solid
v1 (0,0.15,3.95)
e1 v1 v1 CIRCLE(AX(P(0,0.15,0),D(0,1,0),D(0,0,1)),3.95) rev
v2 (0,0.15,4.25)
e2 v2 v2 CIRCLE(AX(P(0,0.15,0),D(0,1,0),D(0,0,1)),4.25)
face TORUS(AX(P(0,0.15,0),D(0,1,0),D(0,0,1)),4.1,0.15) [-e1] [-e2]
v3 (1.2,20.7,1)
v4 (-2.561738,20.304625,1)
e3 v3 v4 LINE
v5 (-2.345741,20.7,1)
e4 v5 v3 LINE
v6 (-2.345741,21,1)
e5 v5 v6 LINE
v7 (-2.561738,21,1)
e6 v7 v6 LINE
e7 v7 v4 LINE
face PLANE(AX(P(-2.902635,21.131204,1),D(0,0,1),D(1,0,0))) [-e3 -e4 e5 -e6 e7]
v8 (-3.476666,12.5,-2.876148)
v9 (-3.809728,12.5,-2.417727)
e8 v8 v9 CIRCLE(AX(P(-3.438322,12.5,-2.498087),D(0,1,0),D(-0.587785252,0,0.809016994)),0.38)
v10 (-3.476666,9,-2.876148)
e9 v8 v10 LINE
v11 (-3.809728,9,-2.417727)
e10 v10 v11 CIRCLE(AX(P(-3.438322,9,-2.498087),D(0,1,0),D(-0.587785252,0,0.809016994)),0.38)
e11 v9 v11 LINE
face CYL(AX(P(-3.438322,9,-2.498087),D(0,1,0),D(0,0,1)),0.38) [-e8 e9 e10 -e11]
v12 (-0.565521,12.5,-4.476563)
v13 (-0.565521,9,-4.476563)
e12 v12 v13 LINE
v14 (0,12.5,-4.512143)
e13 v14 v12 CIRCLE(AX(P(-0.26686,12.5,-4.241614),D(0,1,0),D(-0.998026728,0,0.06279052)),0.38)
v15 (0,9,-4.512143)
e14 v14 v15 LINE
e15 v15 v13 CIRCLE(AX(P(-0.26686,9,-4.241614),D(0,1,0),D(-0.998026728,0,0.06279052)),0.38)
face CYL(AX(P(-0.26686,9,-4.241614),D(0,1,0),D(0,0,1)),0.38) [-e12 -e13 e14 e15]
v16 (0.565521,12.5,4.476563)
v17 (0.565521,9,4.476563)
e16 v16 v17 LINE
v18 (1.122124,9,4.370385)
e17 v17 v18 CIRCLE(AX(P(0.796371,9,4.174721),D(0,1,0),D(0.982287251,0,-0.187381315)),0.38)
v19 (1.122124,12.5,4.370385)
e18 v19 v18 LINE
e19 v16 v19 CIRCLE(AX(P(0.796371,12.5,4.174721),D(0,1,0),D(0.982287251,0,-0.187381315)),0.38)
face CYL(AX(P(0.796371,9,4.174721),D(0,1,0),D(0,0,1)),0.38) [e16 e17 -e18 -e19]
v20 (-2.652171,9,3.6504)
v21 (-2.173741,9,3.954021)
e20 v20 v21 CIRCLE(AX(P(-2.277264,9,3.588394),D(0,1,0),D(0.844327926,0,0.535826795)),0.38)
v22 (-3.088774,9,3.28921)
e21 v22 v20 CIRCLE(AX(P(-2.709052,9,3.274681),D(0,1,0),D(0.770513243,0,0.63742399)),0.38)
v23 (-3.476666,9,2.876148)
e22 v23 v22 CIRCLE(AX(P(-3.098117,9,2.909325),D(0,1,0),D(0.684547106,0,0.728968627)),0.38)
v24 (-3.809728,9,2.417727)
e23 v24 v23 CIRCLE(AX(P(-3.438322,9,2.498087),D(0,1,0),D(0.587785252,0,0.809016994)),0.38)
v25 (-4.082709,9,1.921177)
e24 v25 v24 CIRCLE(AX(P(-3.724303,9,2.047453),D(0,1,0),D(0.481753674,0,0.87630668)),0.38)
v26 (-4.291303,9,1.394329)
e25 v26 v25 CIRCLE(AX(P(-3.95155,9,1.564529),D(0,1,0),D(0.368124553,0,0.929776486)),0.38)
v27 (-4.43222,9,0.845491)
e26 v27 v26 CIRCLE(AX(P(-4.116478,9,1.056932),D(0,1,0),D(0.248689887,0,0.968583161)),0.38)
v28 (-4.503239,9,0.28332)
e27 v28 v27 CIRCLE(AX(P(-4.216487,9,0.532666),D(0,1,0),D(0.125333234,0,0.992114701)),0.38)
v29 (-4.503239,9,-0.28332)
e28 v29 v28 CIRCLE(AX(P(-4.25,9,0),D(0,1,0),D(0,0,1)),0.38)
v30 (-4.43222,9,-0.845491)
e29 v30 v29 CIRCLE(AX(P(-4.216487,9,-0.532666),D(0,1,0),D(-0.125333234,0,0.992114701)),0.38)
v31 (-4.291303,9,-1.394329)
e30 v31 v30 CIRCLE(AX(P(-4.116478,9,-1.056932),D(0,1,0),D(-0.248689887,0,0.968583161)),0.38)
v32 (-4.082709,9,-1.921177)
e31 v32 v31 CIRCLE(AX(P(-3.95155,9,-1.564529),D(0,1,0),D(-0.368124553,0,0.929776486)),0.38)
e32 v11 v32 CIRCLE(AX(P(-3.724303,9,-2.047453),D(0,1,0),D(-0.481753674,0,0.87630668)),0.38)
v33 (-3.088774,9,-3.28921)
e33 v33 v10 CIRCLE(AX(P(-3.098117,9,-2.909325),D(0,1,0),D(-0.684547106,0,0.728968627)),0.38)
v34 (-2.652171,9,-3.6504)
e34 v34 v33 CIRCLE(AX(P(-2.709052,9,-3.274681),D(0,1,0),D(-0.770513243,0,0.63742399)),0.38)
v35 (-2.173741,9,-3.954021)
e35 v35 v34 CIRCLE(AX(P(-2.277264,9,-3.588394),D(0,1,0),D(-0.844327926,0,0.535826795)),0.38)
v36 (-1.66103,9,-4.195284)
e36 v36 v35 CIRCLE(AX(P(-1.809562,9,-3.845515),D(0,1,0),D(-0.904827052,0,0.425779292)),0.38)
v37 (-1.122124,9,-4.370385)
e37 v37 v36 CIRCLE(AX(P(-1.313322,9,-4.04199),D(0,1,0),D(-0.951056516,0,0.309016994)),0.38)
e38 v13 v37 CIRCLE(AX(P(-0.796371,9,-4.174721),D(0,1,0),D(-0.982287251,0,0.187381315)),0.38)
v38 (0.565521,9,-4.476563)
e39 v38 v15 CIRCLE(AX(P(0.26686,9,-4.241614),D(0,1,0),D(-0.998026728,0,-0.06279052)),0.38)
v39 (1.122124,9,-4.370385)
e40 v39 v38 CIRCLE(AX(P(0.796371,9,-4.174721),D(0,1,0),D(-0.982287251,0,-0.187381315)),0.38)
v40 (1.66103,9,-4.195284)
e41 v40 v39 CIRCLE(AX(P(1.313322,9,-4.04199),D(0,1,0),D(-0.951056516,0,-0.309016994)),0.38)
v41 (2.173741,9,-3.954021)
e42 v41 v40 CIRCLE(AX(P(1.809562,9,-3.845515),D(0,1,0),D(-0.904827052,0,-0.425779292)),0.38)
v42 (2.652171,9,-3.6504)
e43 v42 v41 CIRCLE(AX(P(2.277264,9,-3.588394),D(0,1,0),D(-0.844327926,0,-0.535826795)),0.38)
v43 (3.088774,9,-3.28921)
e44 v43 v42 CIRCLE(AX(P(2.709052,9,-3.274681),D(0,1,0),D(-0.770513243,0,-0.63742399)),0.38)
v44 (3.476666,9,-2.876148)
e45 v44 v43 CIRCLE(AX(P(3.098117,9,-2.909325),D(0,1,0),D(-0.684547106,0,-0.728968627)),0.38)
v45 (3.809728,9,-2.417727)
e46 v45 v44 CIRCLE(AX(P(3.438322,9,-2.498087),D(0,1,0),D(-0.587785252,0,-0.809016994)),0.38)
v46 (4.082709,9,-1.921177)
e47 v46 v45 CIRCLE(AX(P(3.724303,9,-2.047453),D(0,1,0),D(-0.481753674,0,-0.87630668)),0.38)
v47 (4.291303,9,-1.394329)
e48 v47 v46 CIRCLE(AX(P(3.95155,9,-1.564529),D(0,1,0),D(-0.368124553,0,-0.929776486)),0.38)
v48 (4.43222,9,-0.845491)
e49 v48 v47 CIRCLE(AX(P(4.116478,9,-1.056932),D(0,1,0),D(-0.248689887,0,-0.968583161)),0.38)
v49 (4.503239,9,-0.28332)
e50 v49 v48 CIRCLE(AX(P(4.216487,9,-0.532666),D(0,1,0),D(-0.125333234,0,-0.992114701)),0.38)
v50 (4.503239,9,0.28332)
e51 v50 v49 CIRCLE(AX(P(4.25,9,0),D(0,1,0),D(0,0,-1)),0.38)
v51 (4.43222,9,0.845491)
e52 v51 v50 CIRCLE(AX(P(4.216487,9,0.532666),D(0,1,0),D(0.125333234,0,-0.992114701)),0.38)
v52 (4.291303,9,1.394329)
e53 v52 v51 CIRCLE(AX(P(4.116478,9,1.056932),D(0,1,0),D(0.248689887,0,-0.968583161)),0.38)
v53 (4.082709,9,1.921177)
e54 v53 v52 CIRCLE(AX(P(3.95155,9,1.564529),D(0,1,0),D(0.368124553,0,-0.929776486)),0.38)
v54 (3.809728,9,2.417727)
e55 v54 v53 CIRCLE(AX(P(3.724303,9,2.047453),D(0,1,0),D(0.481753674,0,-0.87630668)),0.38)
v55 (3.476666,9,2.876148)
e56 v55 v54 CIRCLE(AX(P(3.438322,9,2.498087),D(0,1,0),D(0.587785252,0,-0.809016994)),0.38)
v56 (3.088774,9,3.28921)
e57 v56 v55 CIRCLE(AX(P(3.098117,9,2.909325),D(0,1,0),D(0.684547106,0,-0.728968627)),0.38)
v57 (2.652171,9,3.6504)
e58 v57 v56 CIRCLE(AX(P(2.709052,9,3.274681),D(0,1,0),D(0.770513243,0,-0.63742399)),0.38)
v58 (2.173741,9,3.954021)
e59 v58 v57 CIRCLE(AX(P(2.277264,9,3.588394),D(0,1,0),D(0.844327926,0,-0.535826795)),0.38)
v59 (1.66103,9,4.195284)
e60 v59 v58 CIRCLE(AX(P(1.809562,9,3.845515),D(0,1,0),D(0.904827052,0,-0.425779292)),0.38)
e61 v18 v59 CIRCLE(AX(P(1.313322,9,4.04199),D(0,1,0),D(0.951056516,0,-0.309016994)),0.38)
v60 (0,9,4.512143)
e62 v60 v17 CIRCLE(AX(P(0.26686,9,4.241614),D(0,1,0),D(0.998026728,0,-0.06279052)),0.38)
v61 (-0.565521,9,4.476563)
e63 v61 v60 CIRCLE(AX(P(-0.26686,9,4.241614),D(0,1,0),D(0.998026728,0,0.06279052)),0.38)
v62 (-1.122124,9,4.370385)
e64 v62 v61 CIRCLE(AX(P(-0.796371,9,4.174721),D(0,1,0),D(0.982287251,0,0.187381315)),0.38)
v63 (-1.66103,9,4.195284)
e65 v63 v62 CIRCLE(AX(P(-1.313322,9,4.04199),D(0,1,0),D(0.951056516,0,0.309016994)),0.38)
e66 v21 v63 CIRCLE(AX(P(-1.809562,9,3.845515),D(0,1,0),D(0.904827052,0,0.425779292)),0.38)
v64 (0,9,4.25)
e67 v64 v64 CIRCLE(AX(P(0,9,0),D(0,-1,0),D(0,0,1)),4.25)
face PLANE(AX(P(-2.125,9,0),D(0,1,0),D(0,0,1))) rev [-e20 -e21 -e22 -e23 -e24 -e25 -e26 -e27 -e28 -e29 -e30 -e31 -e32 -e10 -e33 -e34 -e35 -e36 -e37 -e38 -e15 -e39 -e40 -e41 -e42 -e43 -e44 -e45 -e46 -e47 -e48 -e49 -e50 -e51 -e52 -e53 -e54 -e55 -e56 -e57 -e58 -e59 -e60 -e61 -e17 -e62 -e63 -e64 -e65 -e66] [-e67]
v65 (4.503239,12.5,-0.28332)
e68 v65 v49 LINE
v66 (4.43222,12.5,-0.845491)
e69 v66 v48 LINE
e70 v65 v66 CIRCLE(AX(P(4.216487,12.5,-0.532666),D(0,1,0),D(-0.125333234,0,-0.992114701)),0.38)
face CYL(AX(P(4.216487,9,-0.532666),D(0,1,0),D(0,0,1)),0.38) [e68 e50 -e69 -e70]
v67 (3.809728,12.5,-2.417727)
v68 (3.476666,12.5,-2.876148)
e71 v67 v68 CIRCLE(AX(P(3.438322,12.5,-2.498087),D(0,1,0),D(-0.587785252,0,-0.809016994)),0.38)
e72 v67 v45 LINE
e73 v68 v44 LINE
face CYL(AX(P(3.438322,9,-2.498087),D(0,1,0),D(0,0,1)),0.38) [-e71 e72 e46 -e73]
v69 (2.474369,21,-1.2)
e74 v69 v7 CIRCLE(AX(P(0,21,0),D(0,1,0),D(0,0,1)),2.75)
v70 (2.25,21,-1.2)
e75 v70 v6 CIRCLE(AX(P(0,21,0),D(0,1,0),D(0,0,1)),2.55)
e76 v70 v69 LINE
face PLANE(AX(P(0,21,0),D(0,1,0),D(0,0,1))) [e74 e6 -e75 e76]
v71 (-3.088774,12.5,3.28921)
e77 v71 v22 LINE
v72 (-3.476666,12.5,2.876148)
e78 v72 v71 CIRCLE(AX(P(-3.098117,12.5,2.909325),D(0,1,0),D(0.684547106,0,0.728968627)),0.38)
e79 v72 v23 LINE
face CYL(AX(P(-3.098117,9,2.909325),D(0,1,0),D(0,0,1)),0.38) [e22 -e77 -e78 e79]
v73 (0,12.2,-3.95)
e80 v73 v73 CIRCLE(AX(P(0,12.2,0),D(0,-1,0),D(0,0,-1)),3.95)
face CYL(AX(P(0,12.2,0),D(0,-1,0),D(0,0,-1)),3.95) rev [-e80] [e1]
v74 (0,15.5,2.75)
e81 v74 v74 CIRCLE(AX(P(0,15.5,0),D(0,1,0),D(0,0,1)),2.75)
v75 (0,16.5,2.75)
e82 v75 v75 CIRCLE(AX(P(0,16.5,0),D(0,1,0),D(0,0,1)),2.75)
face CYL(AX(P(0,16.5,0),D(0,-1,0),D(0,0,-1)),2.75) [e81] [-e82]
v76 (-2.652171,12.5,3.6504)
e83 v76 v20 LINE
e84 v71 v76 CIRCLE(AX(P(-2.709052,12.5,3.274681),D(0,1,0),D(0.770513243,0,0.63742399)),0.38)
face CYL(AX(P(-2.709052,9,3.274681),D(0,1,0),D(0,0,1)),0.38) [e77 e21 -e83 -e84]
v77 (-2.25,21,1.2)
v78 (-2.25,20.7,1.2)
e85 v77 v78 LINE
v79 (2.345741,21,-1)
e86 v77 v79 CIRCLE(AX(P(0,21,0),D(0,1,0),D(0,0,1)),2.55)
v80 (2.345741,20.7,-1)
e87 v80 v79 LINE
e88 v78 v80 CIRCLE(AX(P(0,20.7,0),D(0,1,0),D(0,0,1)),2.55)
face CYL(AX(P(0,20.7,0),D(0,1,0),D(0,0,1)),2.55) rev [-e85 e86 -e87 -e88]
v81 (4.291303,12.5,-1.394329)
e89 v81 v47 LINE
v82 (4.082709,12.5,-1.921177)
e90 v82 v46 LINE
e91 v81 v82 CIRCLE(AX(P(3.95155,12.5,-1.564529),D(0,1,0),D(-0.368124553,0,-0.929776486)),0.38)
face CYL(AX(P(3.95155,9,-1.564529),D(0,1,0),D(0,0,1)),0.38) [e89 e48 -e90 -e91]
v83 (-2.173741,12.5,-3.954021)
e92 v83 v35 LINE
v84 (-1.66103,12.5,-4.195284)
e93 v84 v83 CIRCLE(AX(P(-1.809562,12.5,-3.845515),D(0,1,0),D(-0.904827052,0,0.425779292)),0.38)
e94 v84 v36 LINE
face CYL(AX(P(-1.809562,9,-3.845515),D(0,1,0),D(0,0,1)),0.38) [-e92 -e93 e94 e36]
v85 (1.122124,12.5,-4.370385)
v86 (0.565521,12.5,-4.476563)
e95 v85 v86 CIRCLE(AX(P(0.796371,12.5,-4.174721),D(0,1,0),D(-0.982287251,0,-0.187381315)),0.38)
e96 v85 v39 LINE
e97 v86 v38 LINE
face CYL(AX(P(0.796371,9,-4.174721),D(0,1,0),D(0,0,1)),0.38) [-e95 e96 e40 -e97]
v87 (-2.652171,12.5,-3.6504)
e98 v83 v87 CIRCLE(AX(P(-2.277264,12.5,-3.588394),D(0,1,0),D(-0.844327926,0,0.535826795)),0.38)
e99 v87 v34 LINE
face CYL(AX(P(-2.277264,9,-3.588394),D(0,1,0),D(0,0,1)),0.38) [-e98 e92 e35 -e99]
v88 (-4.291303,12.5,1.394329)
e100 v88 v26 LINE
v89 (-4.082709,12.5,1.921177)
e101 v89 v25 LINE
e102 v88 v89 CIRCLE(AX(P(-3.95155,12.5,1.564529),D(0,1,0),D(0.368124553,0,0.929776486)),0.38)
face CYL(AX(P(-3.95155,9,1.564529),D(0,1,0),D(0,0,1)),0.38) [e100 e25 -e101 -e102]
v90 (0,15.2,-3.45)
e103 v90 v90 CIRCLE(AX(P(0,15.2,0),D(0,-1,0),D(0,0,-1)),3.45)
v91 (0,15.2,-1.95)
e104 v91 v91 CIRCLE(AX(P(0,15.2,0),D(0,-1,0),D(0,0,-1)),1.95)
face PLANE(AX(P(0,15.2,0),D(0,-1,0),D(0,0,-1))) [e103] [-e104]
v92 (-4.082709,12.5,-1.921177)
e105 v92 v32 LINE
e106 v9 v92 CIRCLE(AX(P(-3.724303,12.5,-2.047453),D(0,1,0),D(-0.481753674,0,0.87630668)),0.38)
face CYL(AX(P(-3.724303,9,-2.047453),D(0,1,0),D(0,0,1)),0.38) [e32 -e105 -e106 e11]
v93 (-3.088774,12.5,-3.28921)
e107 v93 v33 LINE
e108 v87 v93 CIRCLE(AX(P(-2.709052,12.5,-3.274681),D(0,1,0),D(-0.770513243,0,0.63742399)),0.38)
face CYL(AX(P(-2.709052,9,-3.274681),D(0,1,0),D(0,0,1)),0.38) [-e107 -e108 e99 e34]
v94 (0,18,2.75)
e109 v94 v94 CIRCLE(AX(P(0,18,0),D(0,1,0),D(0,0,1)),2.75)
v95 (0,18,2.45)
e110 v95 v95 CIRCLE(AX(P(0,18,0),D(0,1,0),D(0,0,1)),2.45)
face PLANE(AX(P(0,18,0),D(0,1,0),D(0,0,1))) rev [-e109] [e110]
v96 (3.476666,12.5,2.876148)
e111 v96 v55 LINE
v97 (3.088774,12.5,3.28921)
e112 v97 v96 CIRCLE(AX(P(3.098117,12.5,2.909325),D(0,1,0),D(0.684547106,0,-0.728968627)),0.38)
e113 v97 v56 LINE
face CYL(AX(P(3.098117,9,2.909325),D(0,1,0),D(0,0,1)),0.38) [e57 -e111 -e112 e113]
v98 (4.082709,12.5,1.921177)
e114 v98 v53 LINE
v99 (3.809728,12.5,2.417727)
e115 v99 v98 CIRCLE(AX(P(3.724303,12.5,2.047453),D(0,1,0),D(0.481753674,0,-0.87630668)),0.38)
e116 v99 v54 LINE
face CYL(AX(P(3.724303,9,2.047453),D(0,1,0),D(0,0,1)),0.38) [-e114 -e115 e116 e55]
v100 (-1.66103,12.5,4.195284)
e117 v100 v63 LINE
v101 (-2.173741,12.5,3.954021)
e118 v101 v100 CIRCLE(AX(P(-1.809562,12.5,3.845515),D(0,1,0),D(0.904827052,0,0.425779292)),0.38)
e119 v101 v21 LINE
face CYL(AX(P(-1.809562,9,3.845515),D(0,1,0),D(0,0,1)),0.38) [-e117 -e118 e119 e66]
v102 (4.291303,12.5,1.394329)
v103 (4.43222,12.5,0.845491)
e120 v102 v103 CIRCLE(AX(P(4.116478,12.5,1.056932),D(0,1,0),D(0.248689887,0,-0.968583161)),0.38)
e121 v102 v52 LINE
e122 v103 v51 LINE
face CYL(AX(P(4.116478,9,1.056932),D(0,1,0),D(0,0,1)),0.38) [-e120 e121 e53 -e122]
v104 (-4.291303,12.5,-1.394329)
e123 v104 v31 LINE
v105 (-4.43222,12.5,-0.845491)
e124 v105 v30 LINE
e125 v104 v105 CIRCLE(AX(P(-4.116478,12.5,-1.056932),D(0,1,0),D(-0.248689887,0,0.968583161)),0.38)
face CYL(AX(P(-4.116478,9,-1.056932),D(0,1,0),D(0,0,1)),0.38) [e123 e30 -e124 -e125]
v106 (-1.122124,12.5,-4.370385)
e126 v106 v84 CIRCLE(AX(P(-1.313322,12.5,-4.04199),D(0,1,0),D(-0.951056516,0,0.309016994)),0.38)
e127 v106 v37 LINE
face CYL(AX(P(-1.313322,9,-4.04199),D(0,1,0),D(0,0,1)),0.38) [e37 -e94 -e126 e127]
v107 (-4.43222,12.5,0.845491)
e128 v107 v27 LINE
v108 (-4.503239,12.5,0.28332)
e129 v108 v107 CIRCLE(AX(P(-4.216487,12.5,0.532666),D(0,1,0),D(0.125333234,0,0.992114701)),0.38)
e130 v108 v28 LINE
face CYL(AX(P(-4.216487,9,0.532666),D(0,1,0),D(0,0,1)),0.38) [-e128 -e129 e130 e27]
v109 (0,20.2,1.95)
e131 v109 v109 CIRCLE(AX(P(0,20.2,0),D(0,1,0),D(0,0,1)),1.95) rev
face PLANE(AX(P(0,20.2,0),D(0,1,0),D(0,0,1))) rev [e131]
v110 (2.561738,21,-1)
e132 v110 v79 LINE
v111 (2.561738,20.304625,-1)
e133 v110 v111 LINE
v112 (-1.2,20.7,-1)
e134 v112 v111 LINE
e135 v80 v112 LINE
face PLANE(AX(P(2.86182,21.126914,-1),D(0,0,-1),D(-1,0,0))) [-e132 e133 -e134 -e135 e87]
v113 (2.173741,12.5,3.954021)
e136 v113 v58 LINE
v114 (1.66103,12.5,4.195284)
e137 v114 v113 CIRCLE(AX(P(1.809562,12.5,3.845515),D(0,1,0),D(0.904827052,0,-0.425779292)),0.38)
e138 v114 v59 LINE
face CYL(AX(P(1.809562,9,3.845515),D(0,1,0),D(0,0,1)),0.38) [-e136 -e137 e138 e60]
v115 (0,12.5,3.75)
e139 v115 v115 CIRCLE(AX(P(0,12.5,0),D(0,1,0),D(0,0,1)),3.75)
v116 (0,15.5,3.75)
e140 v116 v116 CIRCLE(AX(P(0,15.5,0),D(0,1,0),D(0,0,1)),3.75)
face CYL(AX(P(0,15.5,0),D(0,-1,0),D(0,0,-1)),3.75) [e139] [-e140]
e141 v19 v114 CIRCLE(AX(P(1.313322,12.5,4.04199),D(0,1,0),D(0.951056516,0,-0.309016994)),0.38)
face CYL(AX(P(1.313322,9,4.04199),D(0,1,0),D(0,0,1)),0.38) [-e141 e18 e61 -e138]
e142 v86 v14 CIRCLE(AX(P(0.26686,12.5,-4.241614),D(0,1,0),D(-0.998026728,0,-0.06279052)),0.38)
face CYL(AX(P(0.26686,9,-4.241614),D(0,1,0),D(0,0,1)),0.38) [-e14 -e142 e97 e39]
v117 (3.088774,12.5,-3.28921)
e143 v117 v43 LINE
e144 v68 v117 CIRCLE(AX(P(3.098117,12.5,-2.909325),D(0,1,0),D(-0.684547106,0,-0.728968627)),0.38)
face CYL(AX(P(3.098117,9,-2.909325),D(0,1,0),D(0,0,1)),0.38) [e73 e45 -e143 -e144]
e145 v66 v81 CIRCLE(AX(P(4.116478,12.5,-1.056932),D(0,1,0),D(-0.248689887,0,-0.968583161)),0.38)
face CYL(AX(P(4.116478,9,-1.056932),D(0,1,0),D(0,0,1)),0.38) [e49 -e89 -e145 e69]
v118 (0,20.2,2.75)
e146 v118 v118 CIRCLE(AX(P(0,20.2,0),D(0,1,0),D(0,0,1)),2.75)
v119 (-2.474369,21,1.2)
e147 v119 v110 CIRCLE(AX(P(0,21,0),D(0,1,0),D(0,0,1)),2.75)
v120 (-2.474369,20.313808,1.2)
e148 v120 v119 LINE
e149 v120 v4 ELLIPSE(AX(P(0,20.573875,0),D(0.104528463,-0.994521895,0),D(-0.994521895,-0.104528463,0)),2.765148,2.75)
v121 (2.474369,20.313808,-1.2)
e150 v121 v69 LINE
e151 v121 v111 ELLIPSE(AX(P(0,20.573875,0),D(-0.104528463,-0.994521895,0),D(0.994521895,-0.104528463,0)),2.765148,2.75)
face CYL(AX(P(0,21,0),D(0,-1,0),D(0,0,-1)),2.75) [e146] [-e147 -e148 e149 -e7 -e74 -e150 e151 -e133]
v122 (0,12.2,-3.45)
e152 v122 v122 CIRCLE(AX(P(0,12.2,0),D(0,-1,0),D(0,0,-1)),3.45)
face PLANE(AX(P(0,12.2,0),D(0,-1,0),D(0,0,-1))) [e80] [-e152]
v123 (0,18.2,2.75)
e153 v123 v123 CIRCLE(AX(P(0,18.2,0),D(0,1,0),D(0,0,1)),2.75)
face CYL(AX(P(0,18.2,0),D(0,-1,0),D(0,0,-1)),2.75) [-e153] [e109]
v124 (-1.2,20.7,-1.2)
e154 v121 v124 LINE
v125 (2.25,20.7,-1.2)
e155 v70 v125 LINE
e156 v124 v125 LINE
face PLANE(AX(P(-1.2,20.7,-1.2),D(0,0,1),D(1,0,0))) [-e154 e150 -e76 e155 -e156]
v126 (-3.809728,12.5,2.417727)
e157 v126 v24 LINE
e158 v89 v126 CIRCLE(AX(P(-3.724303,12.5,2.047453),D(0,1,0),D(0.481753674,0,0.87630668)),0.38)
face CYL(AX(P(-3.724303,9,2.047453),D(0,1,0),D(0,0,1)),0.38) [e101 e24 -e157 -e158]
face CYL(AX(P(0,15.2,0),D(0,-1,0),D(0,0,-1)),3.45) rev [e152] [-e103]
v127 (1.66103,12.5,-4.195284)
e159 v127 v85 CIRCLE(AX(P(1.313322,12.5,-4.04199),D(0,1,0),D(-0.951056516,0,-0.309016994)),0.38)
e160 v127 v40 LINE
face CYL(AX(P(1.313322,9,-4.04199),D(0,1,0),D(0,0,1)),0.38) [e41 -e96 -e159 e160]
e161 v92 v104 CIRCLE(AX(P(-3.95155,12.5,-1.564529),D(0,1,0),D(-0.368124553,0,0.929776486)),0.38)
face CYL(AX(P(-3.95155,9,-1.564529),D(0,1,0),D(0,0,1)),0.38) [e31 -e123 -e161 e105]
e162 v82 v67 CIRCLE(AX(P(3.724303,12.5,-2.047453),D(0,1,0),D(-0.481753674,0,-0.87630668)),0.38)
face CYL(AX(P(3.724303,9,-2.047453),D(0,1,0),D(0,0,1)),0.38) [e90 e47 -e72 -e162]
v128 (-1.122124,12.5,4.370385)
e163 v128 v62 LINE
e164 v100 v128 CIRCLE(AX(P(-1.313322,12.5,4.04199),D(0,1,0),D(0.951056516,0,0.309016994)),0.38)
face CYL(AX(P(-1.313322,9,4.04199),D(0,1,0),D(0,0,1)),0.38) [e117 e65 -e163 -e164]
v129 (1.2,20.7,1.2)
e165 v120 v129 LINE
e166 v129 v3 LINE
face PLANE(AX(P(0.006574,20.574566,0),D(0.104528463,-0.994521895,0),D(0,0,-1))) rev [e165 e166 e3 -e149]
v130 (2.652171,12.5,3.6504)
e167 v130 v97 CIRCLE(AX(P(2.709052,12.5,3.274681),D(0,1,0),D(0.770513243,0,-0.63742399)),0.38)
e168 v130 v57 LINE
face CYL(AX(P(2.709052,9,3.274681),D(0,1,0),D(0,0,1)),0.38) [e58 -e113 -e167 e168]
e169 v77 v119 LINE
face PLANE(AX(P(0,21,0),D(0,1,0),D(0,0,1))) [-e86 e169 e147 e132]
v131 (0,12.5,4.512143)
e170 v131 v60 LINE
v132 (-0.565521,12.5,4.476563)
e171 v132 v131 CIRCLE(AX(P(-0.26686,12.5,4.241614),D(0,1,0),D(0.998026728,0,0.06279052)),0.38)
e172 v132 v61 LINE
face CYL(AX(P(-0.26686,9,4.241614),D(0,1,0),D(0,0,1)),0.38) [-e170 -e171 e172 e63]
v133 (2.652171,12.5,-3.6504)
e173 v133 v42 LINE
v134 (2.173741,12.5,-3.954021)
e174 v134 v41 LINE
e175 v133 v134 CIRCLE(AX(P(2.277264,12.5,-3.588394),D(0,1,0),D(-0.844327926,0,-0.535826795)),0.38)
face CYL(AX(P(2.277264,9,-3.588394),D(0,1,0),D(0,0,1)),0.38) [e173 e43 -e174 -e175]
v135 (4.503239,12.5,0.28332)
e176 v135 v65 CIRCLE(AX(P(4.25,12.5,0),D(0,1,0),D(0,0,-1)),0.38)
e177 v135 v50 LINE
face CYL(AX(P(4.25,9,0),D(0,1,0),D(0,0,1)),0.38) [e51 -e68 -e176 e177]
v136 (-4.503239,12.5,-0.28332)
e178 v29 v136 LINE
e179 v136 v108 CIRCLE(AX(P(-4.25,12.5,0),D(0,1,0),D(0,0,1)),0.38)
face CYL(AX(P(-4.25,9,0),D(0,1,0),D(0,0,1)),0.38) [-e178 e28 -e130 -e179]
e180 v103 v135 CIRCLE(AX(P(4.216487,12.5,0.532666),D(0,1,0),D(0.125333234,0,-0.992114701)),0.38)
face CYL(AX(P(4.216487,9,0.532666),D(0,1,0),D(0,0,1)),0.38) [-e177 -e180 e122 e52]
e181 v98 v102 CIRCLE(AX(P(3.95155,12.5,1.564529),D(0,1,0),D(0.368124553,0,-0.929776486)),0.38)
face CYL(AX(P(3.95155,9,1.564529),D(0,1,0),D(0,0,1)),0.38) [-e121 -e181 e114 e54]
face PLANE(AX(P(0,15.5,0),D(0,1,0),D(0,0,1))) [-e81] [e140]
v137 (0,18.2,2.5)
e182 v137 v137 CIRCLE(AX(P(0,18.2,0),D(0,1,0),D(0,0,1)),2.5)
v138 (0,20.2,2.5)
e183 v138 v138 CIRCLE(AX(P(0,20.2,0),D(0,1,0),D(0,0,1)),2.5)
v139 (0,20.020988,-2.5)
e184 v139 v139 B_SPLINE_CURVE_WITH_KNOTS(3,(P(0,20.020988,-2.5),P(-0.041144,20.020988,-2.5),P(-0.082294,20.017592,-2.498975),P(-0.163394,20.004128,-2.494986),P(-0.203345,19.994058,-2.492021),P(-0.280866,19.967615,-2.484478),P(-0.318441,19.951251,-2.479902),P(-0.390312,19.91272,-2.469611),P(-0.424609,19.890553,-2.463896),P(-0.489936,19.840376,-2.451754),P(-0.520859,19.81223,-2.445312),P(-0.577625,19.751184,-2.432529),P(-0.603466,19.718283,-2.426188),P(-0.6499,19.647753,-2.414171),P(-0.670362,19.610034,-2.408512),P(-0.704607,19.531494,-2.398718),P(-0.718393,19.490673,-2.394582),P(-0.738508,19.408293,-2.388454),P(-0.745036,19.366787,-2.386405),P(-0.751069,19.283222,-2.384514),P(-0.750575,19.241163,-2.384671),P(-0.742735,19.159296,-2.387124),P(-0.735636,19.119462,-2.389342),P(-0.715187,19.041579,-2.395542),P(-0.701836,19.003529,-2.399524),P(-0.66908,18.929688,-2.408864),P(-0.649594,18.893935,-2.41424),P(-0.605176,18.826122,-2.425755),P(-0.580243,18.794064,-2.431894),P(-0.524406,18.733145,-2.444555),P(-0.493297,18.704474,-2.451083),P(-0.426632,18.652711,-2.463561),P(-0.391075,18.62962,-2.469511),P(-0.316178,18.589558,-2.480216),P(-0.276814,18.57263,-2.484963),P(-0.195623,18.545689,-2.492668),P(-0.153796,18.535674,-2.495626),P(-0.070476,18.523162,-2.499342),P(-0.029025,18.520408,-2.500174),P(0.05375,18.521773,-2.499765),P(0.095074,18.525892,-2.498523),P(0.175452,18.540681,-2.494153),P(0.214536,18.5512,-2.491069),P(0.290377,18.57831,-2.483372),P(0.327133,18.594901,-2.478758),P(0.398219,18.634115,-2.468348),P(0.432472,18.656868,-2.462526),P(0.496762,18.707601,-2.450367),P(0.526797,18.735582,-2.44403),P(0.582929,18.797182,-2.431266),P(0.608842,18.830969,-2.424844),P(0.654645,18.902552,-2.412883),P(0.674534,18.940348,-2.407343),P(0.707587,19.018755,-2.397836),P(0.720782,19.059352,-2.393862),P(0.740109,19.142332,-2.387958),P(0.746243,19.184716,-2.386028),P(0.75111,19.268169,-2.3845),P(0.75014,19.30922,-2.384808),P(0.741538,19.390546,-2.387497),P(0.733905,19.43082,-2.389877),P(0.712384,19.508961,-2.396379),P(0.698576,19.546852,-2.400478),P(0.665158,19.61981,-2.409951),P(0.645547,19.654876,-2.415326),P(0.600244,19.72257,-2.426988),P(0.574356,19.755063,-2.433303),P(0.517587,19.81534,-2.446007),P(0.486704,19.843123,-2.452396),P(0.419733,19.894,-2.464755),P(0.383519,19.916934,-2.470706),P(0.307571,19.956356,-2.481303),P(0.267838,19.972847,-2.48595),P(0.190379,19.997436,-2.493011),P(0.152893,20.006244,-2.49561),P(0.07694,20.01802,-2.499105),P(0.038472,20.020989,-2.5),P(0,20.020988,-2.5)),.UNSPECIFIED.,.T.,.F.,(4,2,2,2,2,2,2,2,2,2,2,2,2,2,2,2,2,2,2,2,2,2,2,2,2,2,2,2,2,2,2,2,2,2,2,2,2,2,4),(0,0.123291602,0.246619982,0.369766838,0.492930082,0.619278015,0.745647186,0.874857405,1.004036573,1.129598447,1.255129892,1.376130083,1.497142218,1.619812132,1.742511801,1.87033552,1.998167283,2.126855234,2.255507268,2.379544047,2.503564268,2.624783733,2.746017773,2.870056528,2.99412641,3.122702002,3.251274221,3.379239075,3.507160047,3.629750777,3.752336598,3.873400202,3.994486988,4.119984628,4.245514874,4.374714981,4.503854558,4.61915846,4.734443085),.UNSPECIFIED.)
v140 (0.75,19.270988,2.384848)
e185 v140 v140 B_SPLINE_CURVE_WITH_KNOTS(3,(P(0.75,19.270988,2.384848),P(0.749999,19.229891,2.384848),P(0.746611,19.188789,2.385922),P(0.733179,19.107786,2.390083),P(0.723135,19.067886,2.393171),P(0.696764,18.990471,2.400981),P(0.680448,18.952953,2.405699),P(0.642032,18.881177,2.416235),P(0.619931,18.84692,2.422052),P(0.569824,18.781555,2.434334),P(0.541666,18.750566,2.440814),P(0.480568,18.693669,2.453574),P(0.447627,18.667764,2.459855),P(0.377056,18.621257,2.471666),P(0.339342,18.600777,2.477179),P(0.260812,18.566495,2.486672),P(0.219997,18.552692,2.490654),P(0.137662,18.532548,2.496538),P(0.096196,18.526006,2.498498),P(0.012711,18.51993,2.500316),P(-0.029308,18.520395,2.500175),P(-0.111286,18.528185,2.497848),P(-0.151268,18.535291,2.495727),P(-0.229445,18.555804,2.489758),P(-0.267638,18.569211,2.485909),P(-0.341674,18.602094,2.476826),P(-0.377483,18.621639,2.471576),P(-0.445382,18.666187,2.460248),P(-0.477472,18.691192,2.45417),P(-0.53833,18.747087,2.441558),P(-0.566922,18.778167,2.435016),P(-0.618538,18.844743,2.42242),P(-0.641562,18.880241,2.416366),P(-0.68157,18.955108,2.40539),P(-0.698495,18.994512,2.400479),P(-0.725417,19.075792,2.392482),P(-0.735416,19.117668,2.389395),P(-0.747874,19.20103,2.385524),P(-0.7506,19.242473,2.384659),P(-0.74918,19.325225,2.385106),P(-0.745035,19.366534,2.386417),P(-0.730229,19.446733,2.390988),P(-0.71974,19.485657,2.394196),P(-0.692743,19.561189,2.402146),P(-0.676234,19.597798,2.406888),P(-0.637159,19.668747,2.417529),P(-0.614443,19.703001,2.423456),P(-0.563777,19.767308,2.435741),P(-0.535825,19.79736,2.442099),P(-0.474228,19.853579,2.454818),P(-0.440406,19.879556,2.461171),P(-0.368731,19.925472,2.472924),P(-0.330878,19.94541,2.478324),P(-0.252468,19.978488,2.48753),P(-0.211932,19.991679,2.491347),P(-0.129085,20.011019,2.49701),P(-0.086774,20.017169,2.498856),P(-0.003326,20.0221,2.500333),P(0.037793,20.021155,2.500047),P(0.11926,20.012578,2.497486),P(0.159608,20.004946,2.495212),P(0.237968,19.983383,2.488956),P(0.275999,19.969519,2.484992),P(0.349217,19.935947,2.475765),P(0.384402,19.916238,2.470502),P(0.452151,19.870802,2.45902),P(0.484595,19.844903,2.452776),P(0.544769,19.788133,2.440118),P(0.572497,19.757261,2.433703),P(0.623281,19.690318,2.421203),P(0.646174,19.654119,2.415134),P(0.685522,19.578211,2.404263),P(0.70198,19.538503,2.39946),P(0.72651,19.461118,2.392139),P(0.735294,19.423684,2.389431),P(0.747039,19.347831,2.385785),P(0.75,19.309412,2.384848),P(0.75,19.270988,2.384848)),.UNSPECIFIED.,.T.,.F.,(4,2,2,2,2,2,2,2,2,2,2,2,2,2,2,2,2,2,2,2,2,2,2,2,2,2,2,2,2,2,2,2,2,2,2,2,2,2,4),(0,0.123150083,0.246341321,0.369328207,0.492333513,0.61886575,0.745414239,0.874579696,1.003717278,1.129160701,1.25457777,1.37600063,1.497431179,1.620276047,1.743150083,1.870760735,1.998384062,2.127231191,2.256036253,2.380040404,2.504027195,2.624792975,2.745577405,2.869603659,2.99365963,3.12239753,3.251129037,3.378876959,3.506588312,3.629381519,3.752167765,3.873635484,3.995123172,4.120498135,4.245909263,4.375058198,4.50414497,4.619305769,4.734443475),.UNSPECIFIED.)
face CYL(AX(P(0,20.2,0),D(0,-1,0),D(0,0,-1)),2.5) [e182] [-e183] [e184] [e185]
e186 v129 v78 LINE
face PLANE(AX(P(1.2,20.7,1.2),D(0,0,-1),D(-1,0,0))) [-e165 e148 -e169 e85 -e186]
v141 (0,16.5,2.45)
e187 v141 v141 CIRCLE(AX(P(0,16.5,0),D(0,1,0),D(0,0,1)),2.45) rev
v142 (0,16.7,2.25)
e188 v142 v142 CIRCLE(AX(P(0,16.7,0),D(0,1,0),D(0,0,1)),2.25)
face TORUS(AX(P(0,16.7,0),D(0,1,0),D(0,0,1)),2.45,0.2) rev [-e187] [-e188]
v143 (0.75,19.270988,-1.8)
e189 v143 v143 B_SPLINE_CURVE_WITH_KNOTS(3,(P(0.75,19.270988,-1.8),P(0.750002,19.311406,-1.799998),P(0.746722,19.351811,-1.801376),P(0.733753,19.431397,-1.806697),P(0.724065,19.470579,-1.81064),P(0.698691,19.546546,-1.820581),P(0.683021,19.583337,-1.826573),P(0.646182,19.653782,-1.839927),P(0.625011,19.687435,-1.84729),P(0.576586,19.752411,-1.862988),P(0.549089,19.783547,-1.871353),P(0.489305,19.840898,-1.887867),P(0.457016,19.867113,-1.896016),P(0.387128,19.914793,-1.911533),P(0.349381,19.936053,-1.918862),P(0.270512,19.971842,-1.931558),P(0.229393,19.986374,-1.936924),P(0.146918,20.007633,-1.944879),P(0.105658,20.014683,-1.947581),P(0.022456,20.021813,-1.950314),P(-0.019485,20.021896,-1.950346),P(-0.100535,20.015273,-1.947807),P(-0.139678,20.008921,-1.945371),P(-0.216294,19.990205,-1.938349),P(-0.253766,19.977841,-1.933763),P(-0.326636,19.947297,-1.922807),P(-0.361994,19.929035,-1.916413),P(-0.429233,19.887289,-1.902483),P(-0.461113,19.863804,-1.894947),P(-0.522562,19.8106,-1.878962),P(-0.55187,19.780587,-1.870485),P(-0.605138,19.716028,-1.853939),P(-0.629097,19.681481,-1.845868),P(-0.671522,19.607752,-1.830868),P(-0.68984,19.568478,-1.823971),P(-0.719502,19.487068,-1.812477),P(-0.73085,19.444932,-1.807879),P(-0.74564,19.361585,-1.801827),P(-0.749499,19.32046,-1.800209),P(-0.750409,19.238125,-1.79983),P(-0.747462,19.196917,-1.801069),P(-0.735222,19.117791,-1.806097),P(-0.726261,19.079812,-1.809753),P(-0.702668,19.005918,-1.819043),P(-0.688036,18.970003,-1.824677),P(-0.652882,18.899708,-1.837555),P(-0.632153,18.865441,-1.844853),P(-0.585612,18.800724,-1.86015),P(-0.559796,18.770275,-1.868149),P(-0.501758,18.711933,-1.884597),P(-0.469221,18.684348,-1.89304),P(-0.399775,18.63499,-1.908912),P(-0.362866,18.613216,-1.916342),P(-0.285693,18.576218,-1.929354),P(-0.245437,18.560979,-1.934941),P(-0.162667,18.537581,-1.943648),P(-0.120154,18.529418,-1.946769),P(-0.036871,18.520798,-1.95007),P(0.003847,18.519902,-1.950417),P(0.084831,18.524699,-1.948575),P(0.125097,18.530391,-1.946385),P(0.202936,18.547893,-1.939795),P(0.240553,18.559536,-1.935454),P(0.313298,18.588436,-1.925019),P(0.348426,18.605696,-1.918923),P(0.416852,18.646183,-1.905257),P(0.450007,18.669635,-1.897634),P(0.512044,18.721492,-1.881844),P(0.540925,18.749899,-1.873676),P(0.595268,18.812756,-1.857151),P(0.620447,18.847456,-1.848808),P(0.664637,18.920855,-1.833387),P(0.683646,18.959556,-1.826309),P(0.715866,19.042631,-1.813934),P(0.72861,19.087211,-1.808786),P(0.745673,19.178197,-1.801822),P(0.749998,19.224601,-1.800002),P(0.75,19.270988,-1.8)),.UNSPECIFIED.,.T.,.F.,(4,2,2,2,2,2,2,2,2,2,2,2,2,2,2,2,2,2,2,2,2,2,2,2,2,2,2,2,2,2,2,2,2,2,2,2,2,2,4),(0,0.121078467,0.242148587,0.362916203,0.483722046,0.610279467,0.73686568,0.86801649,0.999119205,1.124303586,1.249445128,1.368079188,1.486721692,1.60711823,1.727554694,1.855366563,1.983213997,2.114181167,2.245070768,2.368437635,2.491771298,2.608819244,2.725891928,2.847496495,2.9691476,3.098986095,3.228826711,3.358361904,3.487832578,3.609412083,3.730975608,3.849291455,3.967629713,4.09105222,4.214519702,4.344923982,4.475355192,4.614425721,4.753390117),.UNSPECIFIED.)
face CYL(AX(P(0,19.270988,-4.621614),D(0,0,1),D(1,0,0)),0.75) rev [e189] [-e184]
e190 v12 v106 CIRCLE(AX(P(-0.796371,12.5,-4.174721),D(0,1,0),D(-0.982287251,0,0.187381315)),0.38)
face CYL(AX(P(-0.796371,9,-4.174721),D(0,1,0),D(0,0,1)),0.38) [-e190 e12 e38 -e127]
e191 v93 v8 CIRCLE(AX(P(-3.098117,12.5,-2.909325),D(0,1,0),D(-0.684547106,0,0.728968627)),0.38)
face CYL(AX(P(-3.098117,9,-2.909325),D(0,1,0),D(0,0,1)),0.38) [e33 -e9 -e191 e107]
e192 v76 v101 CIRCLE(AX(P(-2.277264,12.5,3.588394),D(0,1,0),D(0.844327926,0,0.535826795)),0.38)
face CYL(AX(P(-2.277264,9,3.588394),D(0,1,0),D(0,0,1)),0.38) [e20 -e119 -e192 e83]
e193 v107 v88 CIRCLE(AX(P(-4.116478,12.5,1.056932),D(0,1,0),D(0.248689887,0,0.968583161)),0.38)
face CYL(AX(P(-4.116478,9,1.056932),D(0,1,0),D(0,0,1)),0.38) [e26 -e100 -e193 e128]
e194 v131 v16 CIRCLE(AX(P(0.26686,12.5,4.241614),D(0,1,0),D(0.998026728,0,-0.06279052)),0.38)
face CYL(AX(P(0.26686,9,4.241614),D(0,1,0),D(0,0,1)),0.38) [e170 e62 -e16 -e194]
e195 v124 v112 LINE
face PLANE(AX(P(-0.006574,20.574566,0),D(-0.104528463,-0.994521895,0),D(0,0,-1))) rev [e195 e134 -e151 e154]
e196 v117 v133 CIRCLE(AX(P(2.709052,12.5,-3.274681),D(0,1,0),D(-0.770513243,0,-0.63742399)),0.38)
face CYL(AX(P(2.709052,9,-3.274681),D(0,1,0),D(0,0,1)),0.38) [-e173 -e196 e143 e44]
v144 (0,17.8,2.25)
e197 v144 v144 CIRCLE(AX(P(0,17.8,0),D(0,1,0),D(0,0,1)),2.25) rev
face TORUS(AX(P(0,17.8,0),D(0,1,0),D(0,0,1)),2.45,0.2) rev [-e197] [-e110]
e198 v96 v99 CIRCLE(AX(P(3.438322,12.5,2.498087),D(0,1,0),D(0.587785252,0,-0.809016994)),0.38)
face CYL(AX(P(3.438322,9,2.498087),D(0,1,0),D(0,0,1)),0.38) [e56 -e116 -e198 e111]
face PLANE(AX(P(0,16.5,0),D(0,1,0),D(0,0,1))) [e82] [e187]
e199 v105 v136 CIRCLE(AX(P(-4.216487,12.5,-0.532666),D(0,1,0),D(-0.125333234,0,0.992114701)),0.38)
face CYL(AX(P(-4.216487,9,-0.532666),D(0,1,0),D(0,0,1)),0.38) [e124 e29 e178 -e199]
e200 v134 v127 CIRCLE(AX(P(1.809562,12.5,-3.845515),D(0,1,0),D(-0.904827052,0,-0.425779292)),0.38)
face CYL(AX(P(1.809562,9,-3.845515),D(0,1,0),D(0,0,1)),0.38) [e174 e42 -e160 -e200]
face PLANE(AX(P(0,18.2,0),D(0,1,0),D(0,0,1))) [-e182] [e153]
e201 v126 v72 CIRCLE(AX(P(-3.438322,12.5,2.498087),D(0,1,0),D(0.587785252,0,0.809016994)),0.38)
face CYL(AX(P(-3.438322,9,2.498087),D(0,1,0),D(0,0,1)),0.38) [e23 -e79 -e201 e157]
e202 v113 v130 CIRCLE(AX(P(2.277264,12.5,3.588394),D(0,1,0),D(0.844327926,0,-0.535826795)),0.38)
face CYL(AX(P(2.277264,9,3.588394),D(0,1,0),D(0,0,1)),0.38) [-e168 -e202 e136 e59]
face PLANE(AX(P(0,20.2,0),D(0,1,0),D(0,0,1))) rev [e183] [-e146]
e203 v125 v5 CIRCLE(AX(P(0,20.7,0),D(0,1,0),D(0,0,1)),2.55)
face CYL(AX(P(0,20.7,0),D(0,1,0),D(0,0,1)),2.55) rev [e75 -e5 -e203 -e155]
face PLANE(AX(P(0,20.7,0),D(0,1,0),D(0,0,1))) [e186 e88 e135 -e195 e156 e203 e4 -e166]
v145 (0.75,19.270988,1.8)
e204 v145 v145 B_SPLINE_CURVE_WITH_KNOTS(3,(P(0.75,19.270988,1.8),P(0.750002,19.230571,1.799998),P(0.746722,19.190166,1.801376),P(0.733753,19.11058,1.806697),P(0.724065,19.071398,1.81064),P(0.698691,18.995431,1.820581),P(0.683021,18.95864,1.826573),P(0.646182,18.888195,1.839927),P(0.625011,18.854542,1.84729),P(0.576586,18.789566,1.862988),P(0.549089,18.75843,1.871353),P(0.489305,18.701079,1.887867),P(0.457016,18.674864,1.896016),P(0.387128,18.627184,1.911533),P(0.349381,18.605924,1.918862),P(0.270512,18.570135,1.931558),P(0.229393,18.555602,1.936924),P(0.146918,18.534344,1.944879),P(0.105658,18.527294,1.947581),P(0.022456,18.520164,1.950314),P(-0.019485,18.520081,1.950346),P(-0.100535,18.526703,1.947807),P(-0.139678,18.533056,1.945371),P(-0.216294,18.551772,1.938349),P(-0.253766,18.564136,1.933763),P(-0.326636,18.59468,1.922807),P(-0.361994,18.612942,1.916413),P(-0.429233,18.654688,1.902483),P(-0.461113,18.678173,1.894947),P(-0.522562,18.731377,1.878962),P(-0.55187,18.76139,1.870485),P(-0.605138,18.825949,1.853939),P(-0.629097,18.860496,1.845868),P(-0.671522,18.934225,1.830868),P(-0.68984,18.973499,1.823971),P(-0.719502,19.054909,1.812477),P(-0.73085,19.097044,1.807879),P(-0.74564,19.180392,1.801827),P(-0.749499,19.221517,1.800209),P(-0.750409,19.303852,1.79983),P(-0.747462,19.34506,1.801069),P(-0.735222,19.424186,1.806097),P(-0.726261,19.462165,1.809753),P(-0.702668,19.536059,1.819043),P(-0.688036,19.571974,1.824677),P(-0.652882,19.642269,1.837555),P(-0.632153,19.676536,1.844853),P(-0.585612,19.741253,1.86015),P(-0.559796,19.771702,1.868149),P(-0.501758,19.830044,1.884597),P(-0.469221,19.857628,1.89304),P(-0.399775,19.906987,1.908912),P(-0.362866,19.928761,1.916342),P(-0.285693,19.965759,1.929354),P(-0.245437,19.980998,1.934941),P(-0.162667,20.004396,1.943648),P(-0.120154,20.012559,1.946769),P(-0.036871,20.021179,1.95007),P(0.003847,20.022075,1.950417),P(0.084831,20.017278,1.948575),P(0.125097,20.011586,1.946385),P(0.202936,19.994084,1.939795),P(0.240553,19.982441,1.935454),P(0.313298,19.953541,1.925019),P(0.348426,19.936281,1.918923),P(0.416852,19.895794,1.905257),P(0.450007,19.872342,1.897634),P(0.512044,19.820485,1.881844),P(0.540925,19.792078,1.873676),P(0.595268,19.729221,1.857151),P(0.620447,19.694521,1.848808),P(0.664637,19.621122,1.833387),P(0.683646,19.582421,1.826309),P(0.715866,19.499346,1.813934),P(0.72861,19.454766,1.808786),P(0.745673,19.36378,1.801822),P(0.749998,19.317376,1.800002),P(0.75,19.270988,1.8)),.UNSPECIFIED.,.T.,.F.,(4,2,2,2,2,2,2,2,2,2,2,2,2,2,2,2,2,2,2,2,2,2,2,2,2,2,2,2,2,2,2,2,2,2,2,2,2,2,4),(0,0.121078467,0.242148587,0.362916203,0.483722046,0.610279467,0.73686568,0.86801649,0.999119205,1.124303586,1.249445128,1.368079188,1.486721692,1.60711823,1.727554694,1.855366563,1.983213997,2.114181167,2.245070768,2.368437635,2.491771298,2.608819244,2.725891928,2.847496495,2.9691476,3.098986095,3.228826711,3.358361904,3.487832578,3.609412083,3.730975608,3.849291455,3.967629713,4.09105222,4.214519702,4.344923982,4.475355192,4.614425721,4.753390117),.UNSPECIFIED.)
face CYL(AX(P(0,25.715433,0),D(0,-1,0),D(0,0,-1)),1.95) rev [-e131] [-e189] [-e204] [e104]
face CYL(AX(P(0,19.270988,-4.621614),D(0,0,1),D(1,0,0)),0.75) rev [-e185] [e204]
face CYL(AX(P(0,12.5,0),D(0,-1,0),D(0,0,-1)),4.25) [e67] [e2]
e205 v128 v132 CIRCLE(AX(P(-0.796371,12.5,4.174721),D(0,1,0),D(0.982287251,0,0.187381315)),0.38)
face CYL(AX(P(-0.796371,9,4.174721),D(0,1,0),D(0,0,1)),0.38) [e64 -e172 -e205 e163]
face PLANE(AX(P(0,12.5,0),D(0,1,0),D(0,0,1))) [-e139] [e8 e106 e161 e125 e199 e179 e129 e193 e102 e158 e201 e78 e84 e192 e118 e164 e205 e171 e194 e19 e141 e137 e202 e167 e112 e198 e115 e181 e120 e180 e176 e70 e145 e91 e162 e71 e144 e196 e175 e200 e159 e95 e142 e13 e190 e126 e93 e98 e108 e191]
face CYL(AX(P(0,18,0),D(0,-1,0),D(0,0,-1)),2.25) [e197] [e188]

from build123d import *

# Parameters (mm, degrees)
SKETCH1_R                    = 4.25
BOSS_EXTRUDE1_DEPTH          = 12.5
BOSS_EXTRUDE4_START          = -3.5
BOSS_EXTRUDE4_DEPTH          = 3.5
CIRPATTERN5_COUNT            = 50
SKETCH5_R                    = 3.75
BOSS_EXTRUDE5_DEPTH          = 3
SKETCH6_R                    = 2.75
BOSS_EXTRUDE6_DEPTH          = 1
SKETCH7_R                    = 2.25
BOSS_EXTRUDE7_DEPTH          = 1.5
SKETCH8_R                    = 2.75
BOSS_EXTRUDE8_DEPTH          = 0.2
SKETCH9_R                    = 2.5
BOSS_EXTRUDE9_DEPTH          = 2
SKETCH10_R                   = 2.75
BOSS_EXTRUDE10_DEPTH         = 0.8
SKETCH11_R                   = 2.55
CUT_EXTRUDE1_DEPTH           = 0.3
SKETCH12_W                   = 4.125233548
SKETCH12_H                   = 0.2
CUT_REVOLVE1_ANGLE           = 6
CUT_REVOLVE1_OTHER_WAY_ANGLE = 6
SKETCH13_W                   = 4.08419342
SKETCH13_H                   = 0.2
CUT_REVOLVE2_ANGLE           = 6
CUT_REVOLVE2_OTHER_WAY_ANGLE = 6
CUT_EXTRUDE2_DEPTH           = 22.995367972
CUT_EXTRUDE2_DEPTH_BACK      = 22.995367972
SKETCH15_R                   = 0.75
SKETCH16_R                   = 3.95
CUT_EXTRUDE3_DEPTH           = 12.2
SKETCH17_R                   = 3.45
CUT_EXTRUDE4_DEPTH           = 3
CUT_EXTRUDE5_REACH           = 18.548
SKETCH19_R                   = 1.95
FILLET1_R                    = 0.2
FILLET2_R                    = 0.15


with BuildPart() as part:
    # Sketch1 → Boss-Extrude1 (new body)
    with BuildSketch(Plane(origin=(0, 0, 0), x_dir=(1, 0, 0), z_dir=(0, 1, 0))):
        with Locations(Location((0, 0, 0), (0, 0, 270))):
            Circle(SKETCH1_R)
    extrude(amount=BOSS_EXTRUDE1_DEPTH)

    # Sketch4 → Boss-Extrude4 (add)
    with BuildSketch(Plane(origin=(0, 12.5, 0), x_dir=(1, 0, 0), z_dir=(0, 1, 0)).offset(BOSS_EXTRUDE4_START)):
        with BuildLine():
            ThreePointArc((-4.233011765, 0.379620073), (-4.25, 0), (-4.233011765, -0.379620073))
            ThreePointArc((-4.233011765, -0.379620073), (-4.63, 0), (-4.233011765, 0.379620073))
        make_face()
    boss_extrude4 = extrude(amount=BOSS_EXTRUDE4_DEPTH)

    # CirPattern5: Boss-Extrude4 ×50 about axis
    cirpattern5_axis = Axis((0, 0, 0), (0, 1, 0))
    for i in range(1, CIRPATTERN5_COUNT):
        add(boss_extrude4.rotate(cirpattern5_axis, i * 360 / CIRPATTERN5_COUNT))

    # Sketch5 → Boss-Extrude5 (add)
    with BuildSketch(Plane(origin=(0, 12.5, 0), x_dir=(1, 0, 0), z_dir=(0, 1, 0))):
        with Locations(Location((0, 0, 0), (0, 0, 270))):
            Circle(SKETCH5_R)
    extrude(amount=BOSS_EXTRUDE5_DEPTH)

    # Sketch6 → Boss-Extrude6 (add)
    with BuildSketch(Plane(origin=(0, 15.5, 0), x_dir=(1, 0, 0), z_dir=(0, 1, 0))):
        with Locations(Location((0, 0, 0), (0, 0, 270))):
            Circle(SKETCH6_R)
    extrude(amount=BOSS_EXTRUDE6_DEPTH)

    # Sketch7 → Boss-Extrude7 (add)
    with BuildSketch(Plane(origin=(0, 16.5, 0), x_dir=(1, 0, 0), z_dir=(0, 1, 0))):
        with Locations(Location((0, 0, 0), (0, 0, 270))):
            Circle(SKETCH7_R)
    extrude(amount=BOSS_EXTRUDE7_DEPTH)

    # Sketch8 → Boss-Extrude8 (add)
    with BuildSketch(Plane(origin=(0, 18, 0), x_dir=(1, 0, 0), z_dir=(0, 1, 0))):
        with Locations(Location((0, 0, 0), (0, 0, 270))):
            Circle(SKETCH8_R)
    extrude(amount=BOSS_EXTRUDE8_DEPTH)

    # Sketch9 → Boss-Extrude9 (add)
    with BuildSketch(Plane(origin=(0, 18.2, 0), x_dir=(1, 0, 0), z_dir=(0, 1, 0))):
        with Locations(Location((0, 0, 0), (0, 0, 270))):
            Circle(SKETCH9_R)
    extrude(amount=BOSS_EXTRUDE9_DEPTH)

    # Sketch10 → Boss-Extrude10 (add)
    with BuildSketch(Plane(origin=(0, 20.2, 0), x_dir=(1, 0, 0), z_dir=(0, 1, 0))):
        with Locations(Location((0, 0, 0), (0, 0, 270))):
            Circle(SKETCH10_R)
    extrude(amount=BOSS_EXTRUDE10_DEPTH)

    # Sketch11 → Cut-Extrude1 (cut)
    with BuildSketch(Plane(origin=(0, 21, 0), x_dir=(1, 0, 0), z_dir=(0, 1, 0))):
        with Locations(Location((0, 0, 0), (0, 0, 270))):
            Circle(SKETCH11_R)
    extrude(amount=-CUT_EXTRUDE1_DEPTH, mode=Mode.SUBTRACT)

    # Sketch12 → Cut-Revolve1 (revolve, cut)
    with BuildSketch(Plane(origin=(0, 20.7, 0), x_dir=(1, 0, 0), z_dir=(0, 1, 0))):
        with Locations((-0.862616774, -1.1)):
            Rectangle(SKETCH12_W, SKETCH12_H)
    revolve(axis=Axis((1.2, 20.7, -2.474368606), (0, 0, 1)), revolution_arc=CUT_REVOLVE1_ANGLE, mode=Mode.SUBTRACT)

    # Sketch12 → Cut-Revolve1 other way (revolve, cut)
    with BuildSketch(Plane(origin=(0, 20.7, 0), x_dir=(1, 0, 0), z_dir=(0, 1, 0))):
        with Locations((-0.862616774, -1.1)):
            Rectangle(SKETCH12_W, SKETCH12_H)
    revolve(axis=Axis((1.2, 20.7, -2.474368606), (0, 0, -1)), revolution_arc=CUT_REVOLVE1_OTHER_WAY_ANGLE, mode=Mode.SUBTRACT)

    # Sketch13 → Cut-Revolve2 (revolve, cut)
    with BuildSketch(Plane(origin=(0, 20.7, 0), x_dir=(1, 0, 0), z_dir=(0, 1, 0))):
        with Locations((0.84209671, 1.1)):
            Rectangle(SKETCH13_W, SKETCH13_H)
    revolve(axis=Axis((-1.2, 20.7, -2.950120445), (0, 0, 1)), revolution_arc=CUT_REVOLVE2_ANGLE, mode=Mode.SUBTRACT)

    # Sketch13 → Cut-Revolve2 other way (revolve, cut)
    with BuildSketch(Plane(origin=(0, 20.7, 0), x_dir=(1, 0, 0), z_dir=(0, 1, 0))):
        with Locations((0.84209671, 1.1)):
            Rectangle(SKETCH13_W, SKETCH13_H)
    revolve(axis=Axis((-1.2, 20.7, -2.950120445), (0, 0, -1)), revolution_arc=CUT_REVOLVE2_OTHER_WAY_ANGLE, mode=Mode.SUBTRACT)

    # Sketch15 → Cut-Extrude2 (cut, two sides: drawn at the far end of the back side and taken through both)
    with BuildSketch(Plane.XY.offset(-CUT_EXTRUDE2_DEPTH_BACK)):
        with Locations(Location((0, 19.270988454, 0), (0, 0, 89.999999982))):
            Circle(SKETCH15_R)
    extrude(amount=CUT_EXTRUDE2_DEPTH + CUT_EXTRUDE2_DEPTH_BACK, mode=Mode.SUBTRACT)

    # Sketch16 → Cut-Extrude3 (cut)
    with BuildSketch(Plane.XZ):
        with Locations(Location((0, 0, 0), (0, 0, 270))):
            Circle(SKETCH16_R)
    extrude(amount=-CUT_EXTRUDE3_DEPTH, mode=Mode.SUBTRACT)

    # Sketch17 → Cut-Extrude4 (cut)
    with BuildSketch(Plane.XZ.offset(-12.2)):
        with Locations(Location((0, 0, 0), (0, 0, 270))):
            Circle(SKETCH17_R)
    extrude(amount=-CUT_EXTRUDE4_DEPTH, mode=Mode.SUBTRACT)

    # Cut-Extrude5: up to this face of the body (flat: up to its plane)
    cut_extrude5_end = Plane(part.part.faces().sort_by_distance((0, 20.2, -2.672218254))[0])
    # Sketch19 → Cut-Extrude5 (cut, up to the picked face)
    with BuildSketch(Plane.XZ.offset(-15.2), mode=Mode.PRIVATE) as cut_extrude5_sk1:
        with Locations(Location((0, 0, 0), (0, 0, 270))):
            Circle(SKETCH19_R)
    cut_extrude5_tool1 = split(extrude(cut_extrude5_sk1.sketch, amount=-CUT_EXTRUDE5_REACH, mode=Mode.PRIVATE), bisect_by=cut_extrude5_end, keep=Keep.BOTH, mode=Mode.PRIVATE)
    add(cut_extrude5_tool1.solids().sort_by(Axis((0, 15.2, 0), (0, 1, 0)))[0], mode=Mode.SUBTRACT)

    # Fillet1
    fillet1_edges = [part.edges().sort_by_distance(p)[0] for p in [
        (0, 16.5, -2.25),
        (0, 18, -2.25),
    ]]
    fillet(fillet1_edges, radius=FILLET1_R)

    # Fillet2
    fillet2_edges = [part.edges().sort_by_distance(p)[0] for p in [
        (0, 0, -4.25),
        (0, 0, 3.95),
    ]]
    fillet(fillet2_edges, radius=FILLET2_R - 0.0001)  # a hair under: the kernel refuses the full size


solid = part.part
